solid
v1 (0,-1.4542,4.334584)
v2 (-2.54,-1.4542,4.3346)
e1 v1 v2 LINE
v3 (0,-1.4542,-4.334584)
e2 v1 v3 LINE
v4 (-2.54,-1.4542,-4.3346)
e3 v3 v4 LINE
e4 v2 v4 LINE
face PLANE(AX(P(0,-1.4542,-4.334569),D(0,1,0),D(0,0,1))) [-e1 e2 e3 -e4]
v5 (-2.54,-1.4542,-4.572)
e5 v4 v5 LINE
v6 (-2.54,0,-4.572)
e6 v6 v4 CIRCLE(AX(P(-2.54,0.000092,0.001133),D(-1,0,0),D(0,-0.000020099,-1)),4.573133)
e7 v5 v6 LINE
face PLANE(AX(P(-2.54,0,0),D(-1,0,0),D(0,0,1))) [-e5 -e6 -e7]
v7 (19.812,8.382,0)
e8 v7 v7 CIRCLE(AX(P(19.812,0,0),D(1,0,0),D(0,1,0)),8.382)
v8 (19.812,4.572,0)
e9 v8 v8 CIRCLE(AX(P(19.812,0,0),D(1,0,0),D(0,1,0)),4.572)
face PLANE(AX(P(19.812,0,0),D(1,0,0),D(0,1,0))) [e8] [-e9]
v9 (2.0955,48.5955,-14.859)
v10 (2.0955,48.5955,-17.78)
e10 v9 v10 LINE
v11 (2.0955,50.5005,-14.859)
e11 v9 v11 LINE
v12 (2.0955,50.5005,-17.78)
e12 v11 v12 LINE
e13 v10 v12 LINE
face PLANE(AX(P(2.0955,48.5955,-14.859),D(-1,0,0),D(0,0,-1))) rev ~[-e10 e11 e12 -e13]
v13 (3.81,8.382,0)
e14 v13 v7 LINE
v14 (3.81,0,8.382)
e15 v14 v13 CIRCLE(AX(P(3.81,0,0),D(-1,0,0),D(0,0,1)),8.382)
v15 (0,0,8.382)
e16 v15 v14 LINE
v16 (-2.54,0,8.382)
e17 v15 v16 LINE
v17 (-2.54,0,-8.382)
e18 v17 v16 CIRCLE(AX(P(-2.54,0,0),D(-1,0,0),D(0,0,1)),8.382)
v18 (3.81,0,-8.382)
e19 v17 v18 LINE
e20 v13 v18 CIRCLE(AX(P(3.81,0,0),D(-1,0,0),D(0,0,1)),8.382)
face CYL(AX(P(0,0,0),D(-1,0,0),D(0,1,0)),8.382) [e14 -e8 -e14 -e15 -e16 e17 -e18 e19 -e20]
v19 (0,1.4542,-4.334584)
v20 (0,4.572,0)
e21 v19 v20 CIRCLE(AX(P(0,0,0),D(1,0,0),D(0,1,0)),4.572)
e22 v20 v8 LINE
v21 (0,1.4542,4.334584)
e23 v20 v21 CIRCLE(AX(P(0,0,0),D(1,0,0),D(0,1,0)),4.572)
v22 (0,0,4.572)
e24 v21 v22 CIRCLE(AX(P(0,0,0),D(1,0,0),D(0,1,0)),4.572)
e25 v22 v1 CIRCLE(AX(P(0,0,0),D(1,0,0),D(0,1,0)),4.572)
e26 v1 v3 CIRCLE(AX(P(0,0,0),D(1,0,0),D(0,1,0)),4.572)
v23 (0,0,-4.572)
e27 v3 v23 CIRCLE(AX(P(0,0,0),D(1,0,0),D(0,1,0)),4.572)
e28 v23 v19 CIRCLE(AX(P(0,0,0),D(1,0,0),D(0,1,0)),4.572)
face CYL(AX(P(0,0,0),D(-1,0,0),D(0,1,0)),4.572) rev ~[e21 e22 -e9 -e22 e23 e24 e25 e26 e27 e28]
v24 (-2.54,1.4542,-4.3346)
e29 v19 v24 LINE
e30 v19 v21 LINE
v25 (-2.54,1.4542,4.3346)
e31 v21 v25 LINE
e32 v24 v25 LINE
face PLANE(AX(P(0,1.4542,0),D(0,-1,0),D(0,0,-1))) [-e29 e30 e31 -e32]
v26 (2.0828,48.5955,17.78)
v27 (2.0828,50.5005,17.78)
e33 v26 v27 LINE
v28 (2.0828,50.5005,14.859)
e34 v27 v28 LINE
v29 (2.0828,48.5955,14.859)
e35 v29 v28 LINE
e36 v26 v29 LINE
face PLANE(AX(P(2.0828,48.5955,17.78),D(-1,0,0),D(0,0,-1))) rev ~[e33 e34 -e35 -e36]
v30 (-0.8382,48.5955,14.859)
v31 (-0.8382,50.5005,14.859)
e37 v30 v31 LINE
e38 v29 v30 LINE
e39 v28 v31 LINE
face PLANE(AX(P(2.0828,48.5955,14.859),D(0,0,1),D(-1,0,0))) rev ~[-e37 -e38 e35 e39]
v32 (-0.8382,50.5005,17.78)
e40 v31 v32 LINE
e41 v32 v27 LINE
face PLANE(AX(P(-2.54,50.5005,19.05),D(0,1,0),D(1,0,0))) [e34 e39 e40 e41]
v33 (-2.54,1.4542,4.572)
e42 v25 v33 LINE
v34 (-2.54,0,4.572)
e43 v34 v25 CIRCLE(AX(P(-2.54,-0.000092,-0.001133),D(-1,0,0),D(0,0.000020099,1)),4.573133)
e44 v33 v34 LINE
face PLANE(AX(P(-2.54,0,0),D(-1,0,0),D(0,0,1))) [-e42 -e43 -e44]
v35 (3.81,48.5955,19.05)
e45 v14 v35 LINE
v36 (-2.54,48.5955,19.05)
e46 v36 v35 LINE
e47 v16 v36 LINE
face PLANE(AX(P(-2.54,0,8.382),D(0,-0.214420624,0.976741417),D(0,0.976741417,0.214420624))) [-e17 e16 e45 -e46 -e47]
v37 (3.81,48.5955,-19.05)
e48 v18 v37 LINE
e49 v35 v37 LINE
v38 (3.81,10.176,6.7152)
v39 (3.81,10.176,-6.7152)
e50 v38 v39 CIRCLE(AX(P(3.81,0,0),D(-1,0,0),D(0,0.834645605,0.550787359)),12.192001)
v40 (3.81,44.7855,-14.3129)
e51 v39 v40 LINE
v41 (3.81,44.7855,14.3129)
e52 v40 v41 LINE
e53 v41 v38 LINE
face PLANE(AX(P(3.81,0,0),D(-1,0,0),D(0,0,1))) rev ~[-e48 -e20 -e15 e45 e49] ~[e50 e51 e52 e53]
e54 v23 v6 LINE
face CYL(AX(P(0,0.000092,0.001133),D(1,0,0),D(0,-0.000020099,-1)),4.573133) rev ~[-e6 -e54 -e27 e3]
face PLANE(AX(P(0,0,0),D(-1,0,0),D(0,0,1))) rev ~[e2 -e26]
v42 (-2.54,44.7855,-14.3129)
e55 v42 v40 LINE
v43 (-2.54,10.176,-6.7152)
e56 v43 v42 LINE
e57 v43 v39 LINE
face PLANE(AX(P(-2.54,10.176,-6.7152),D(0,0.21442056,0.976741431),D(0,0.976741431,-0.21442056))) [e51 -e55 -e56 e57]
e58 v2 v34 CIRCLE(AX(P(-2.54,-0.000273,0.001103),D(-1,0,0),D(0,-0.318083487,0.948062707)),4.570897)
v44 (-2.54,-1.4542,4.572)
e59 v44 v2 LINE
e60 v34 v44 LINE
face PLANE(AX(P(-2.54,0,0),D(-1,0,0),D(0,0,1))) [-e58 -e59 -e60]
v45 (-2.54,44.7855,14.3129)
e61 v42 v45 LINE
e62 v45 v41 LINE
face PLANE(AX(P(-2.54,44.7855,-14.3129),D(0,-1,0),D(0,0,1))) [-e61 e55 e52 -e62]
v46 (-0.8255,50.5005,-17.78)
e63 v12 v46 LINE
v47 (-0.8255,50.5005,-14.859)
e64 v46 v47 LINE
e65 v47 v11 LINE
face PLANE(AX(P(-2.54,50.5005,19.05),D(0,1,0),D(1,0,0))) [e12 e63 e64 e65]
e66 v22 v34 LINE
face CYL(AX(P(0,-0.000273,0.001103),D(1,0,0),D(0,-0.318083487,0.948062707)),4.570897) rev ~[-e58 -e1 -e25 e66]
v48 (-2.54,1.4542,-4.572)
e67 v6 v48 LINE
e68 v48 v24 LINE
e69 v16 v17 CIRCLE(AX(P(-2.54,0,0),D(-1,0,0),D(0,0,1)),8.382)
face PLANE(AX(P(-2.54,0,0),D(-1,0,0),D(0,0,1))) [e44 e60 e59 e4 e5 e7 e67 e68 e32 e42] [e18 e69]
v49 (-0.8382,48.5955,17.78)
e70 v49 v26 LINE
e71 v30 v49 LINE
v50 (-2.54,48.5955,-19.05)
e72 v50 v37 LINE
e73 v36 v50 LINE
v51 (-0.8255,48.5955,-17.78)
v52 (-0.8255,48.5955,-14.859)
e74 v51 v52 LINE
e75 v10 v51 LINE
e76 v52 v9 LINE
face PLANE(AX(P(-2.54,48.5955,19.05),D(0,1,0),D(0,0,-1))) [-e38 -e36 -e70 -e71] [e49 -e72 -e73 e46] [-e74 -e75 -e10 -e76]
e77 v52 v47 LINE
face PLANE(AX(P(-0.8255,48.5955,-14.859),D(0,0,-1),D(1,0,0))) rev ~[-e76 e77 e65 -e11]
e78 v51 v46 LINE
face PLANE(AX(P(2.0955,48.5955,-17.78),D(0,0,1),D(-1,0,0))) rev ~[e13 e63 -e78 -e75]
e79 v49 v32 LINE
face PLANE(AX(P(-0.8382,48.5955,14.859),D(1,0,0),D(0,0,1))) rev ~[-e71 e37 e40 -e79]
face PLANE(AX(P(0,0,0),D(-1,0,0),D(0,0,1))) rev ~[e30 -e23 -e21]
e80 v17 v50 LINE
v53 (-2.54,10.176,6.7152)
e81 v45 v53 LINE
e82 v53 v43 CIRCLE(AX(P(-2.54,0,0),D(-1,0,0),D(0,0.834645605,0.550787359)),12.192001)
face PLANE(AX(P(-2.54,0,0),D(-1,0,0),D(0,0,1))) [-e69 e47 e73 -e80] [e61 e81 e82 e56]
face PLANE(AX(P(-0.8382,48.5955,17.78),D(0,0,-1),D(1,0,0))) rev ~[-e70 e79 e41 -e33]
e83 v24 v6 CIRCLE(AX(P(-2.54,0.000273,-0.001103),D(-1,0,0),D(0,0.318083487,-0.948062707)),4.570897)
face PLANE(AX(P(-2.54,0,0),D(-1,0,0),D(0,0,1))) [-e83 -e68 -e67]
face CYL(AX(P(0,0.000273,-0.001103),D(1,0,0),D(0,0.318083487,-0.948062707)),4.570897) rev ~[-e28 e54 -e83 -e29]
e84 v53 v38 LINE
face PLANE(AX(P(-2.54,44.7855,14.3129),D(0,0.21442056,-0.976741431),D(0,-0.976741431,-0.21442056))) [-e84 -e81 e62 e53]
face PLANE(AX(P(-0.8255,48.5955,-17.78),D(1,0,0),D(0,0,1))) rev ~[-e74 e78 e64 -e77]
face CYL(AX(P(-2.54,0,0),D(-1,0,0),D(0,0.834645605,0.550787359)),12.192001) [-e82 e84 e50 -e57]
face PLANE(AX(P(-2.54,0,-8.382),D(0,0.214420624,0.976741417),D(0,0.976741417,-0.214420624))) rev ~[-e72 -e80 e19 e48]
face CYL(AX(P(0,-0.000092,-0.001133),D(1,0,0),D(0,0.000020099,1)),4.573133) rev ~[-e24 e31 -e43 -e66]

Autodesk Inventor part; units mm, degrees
ref_plane "YZ Plane" through (0, 0, 0) normal (1, 0, 0) x (0, 1, 0)
ref_plane "XZ Plane" through (0, 0, 0) normal (0, 1, 0) x (-1, 0, 0)
ref_plane "XY Plane" through (0, 0, 0) normal (0, 0, 1) x (1, 0, 0)
sketch "Sketch1" plane through (0, 0, 0) normal (1, 0, 0) x (0, 1, 0)
  circle A0 centre (0, 0) radius 4.572
  circle A1 centre (0, 0) radius 8.382
  dimension "d0" = 9.144
  dimension "d1" = 3.81
extrude "Extrusion1" add sketch "Sketch1" along normal blind 19.812
sketch "Sketch2" plane through (0, 0, 0) normal (-1, 0, 0) x (0, 0, 1)
  circle A0 centre (0, 0) radius 8.382
  circle A1 centre (0, 0) radius 7.747
  circle A2 centre (0, 0) radius 8.382 projected
  dimension "d42" = 0
extrude "Extrusion2" add sketch "Sketch2" along normal blind 2.54 contours A0 | A1
sketch "Sketch3" plane through (-2.54, 0, 0) normal (-1, 0, 0) x (0, 0, 1)
  line L0 (19.05, 48.5955) -> (-19.05, 48.5955)
  circle A0 centre (0, 0) radius 8.382 projected
  line L1 (8.382, 0) -> (19.05, 48.5955)
  line L2 (-8.382, 0) -> (-19.05, 48.5955)
  arc A1 (8.382, 0) -> (-8.382, 0) centre (0, 0) ccw
  line L3 (-14.3129, 44.7855) -> (14.3129, 44.7855)
  line L4 (14.3129, 44.7855) -> (6.7152, 10.176)
  arc A2 (6.7152, 10.176) -> (-6.7152, 10.176) centre (0, 0) ccw
  line L5 (-6.7152, 10.176) -> (-14.3129, 44.7855)
  dimension "d6" = 38.1
  dimension "d7" = 19.05
  dimension "d8" = 3.81
extrude "Extrusion3" add sketch "Sketch3" against normal blind 6.35 contours L1 A0 L2 L0
sketch "Sketch6" plane through (-2.54, 44.7855, -14.3129) normal (0, -1, 0) x (1, 0, 0)
  line L0 (6.35, 32.4159) -> (26.9875, 32.4159) projected
  line L1 (13.4874, 32.4159) -> (13.4874, 26.0989)
  line L2 (26.9875, 32.4159) -> (26.9875, -3.9117) projected
  point P0 (2.54, 14.3129)
  dimension "d20" = 13.5001
sketch "Sketch10" plane through (0, 0, 0) normal (1, 0, 0) x (0, 0, -1)
  circle A0 centre (0, 0) radius 1.4542
  line L0 (-4.572, 1.4542) -> (4.572, 1.4542)
  line L1 (4.572, 1.4542) -> (4.572, -1.4542)
  line L2 (4.572, -1.4542) -> (-4.572, -1.4542)
  line L3 (-4.572, -1.4542) -> (-4.572, 1.4542)
  circle A1 centre (0, 0) radius 4.572 projected
  dimension "d43" = 0
  dimension "d44" = 0
extrude "Extrusion7" cut sketch "Sketch10" against normal blind 22.225 contours A0 | A0 L0 A1 L2 | A0 L2 A1 L0 | A1 L3 L0 | L0 L1 A1 | A1 L1 L2 | L2 L3 A1
sketch "Sketch13" plane through (-2.54, 48.5955, 19.05) normal (0, 1, 0) x (1, 0, 0)
  line L0 (4.6355, 36.83) -> (1.7145, 36.83)
  line L1 (1.7145, 36.83) -> (1.7145, 33.909)
  line L2 (1.7145, 33.909) -> (4.6355, 33.909)
  line L3 (4.6355, 33.909) -> (4.6355, 36.83)
  line L4 (6.35, 38.1) -> (6.35, 0) projected
  line L5 (0, 38.1) -> (6.35, 38.1) projected
  line L6 (4.6228, 4.191) -> (1.7018, 4.191)
  line L7 (1.7018, 4.191) -> (1.7018, 1.27)
  line L8 (1.7018, 1.27) -> (4.6228, 1.27)
  line L9 (4.6228, 1.27) -> (4.6228, 4.191)
  line L10 (0, 0) -> (6.35, 0) projected
  point P0 (2.54, 19.05)
  dimension "d32" = 2.921
  dimension "d33" = 2.921
  dimension "d34" = 1.7145
  dimension "d35" = 1.27
  dimension "d36" = 2.921
  dimension "d37" = 2.921
  dimension "d38" = 1.7272
  dimension "d39" = 1.27
extrude "Extrusion9" add sketch "Sketch13" along normal blind 1.905
sketch "Sketch14" plane through (0, 0, 0) normal (-1, 0, 0) x (0, 0, 1)
  arc A0 (4.3346, -1.4542) -> (4.572, 0) centre (0, 0) ccw projected
  line L0 (4.3346, -1.4542) -> (4.572, -1.4542) projected
  line L1 (4.572, -1.4542) -> (4.572, 0) projected
  arc A1 (4.572, 0) -> (4.3346, 1.4542) centre (0, 0) ccw projected
  line L2 (4.572, 0) -> (4.572, 1.4542) projected
  line L3 (4.572, 1.4542) -> (4.3346, 1.4542) projected
  arc A2 (-4.572, 0) -> (-4.3346, -1.4542) centre (0, 0) ccw projected
  line L4 (-4.572, 0) -> (-4.572, -1.4542) projected
  line L5 (-4.572, -1.4542) -> (-4.3346, -1.4542) projected
  arc A3 (-4.3346, 1.4542) -> (-4.572, 0) centre (0, 0) ccw projected
  line L6 (-4.3346, 1.4542) -> (-4.572, 1.4542) projected
  line L7 (-4.572, 1.4542) -> (-4.572, 0) projected
extrude "Extrusion10" add sketch "Sketch14" along normal blind 2.54
properties part number "BasicThrustMotorHousingJustMotor"
